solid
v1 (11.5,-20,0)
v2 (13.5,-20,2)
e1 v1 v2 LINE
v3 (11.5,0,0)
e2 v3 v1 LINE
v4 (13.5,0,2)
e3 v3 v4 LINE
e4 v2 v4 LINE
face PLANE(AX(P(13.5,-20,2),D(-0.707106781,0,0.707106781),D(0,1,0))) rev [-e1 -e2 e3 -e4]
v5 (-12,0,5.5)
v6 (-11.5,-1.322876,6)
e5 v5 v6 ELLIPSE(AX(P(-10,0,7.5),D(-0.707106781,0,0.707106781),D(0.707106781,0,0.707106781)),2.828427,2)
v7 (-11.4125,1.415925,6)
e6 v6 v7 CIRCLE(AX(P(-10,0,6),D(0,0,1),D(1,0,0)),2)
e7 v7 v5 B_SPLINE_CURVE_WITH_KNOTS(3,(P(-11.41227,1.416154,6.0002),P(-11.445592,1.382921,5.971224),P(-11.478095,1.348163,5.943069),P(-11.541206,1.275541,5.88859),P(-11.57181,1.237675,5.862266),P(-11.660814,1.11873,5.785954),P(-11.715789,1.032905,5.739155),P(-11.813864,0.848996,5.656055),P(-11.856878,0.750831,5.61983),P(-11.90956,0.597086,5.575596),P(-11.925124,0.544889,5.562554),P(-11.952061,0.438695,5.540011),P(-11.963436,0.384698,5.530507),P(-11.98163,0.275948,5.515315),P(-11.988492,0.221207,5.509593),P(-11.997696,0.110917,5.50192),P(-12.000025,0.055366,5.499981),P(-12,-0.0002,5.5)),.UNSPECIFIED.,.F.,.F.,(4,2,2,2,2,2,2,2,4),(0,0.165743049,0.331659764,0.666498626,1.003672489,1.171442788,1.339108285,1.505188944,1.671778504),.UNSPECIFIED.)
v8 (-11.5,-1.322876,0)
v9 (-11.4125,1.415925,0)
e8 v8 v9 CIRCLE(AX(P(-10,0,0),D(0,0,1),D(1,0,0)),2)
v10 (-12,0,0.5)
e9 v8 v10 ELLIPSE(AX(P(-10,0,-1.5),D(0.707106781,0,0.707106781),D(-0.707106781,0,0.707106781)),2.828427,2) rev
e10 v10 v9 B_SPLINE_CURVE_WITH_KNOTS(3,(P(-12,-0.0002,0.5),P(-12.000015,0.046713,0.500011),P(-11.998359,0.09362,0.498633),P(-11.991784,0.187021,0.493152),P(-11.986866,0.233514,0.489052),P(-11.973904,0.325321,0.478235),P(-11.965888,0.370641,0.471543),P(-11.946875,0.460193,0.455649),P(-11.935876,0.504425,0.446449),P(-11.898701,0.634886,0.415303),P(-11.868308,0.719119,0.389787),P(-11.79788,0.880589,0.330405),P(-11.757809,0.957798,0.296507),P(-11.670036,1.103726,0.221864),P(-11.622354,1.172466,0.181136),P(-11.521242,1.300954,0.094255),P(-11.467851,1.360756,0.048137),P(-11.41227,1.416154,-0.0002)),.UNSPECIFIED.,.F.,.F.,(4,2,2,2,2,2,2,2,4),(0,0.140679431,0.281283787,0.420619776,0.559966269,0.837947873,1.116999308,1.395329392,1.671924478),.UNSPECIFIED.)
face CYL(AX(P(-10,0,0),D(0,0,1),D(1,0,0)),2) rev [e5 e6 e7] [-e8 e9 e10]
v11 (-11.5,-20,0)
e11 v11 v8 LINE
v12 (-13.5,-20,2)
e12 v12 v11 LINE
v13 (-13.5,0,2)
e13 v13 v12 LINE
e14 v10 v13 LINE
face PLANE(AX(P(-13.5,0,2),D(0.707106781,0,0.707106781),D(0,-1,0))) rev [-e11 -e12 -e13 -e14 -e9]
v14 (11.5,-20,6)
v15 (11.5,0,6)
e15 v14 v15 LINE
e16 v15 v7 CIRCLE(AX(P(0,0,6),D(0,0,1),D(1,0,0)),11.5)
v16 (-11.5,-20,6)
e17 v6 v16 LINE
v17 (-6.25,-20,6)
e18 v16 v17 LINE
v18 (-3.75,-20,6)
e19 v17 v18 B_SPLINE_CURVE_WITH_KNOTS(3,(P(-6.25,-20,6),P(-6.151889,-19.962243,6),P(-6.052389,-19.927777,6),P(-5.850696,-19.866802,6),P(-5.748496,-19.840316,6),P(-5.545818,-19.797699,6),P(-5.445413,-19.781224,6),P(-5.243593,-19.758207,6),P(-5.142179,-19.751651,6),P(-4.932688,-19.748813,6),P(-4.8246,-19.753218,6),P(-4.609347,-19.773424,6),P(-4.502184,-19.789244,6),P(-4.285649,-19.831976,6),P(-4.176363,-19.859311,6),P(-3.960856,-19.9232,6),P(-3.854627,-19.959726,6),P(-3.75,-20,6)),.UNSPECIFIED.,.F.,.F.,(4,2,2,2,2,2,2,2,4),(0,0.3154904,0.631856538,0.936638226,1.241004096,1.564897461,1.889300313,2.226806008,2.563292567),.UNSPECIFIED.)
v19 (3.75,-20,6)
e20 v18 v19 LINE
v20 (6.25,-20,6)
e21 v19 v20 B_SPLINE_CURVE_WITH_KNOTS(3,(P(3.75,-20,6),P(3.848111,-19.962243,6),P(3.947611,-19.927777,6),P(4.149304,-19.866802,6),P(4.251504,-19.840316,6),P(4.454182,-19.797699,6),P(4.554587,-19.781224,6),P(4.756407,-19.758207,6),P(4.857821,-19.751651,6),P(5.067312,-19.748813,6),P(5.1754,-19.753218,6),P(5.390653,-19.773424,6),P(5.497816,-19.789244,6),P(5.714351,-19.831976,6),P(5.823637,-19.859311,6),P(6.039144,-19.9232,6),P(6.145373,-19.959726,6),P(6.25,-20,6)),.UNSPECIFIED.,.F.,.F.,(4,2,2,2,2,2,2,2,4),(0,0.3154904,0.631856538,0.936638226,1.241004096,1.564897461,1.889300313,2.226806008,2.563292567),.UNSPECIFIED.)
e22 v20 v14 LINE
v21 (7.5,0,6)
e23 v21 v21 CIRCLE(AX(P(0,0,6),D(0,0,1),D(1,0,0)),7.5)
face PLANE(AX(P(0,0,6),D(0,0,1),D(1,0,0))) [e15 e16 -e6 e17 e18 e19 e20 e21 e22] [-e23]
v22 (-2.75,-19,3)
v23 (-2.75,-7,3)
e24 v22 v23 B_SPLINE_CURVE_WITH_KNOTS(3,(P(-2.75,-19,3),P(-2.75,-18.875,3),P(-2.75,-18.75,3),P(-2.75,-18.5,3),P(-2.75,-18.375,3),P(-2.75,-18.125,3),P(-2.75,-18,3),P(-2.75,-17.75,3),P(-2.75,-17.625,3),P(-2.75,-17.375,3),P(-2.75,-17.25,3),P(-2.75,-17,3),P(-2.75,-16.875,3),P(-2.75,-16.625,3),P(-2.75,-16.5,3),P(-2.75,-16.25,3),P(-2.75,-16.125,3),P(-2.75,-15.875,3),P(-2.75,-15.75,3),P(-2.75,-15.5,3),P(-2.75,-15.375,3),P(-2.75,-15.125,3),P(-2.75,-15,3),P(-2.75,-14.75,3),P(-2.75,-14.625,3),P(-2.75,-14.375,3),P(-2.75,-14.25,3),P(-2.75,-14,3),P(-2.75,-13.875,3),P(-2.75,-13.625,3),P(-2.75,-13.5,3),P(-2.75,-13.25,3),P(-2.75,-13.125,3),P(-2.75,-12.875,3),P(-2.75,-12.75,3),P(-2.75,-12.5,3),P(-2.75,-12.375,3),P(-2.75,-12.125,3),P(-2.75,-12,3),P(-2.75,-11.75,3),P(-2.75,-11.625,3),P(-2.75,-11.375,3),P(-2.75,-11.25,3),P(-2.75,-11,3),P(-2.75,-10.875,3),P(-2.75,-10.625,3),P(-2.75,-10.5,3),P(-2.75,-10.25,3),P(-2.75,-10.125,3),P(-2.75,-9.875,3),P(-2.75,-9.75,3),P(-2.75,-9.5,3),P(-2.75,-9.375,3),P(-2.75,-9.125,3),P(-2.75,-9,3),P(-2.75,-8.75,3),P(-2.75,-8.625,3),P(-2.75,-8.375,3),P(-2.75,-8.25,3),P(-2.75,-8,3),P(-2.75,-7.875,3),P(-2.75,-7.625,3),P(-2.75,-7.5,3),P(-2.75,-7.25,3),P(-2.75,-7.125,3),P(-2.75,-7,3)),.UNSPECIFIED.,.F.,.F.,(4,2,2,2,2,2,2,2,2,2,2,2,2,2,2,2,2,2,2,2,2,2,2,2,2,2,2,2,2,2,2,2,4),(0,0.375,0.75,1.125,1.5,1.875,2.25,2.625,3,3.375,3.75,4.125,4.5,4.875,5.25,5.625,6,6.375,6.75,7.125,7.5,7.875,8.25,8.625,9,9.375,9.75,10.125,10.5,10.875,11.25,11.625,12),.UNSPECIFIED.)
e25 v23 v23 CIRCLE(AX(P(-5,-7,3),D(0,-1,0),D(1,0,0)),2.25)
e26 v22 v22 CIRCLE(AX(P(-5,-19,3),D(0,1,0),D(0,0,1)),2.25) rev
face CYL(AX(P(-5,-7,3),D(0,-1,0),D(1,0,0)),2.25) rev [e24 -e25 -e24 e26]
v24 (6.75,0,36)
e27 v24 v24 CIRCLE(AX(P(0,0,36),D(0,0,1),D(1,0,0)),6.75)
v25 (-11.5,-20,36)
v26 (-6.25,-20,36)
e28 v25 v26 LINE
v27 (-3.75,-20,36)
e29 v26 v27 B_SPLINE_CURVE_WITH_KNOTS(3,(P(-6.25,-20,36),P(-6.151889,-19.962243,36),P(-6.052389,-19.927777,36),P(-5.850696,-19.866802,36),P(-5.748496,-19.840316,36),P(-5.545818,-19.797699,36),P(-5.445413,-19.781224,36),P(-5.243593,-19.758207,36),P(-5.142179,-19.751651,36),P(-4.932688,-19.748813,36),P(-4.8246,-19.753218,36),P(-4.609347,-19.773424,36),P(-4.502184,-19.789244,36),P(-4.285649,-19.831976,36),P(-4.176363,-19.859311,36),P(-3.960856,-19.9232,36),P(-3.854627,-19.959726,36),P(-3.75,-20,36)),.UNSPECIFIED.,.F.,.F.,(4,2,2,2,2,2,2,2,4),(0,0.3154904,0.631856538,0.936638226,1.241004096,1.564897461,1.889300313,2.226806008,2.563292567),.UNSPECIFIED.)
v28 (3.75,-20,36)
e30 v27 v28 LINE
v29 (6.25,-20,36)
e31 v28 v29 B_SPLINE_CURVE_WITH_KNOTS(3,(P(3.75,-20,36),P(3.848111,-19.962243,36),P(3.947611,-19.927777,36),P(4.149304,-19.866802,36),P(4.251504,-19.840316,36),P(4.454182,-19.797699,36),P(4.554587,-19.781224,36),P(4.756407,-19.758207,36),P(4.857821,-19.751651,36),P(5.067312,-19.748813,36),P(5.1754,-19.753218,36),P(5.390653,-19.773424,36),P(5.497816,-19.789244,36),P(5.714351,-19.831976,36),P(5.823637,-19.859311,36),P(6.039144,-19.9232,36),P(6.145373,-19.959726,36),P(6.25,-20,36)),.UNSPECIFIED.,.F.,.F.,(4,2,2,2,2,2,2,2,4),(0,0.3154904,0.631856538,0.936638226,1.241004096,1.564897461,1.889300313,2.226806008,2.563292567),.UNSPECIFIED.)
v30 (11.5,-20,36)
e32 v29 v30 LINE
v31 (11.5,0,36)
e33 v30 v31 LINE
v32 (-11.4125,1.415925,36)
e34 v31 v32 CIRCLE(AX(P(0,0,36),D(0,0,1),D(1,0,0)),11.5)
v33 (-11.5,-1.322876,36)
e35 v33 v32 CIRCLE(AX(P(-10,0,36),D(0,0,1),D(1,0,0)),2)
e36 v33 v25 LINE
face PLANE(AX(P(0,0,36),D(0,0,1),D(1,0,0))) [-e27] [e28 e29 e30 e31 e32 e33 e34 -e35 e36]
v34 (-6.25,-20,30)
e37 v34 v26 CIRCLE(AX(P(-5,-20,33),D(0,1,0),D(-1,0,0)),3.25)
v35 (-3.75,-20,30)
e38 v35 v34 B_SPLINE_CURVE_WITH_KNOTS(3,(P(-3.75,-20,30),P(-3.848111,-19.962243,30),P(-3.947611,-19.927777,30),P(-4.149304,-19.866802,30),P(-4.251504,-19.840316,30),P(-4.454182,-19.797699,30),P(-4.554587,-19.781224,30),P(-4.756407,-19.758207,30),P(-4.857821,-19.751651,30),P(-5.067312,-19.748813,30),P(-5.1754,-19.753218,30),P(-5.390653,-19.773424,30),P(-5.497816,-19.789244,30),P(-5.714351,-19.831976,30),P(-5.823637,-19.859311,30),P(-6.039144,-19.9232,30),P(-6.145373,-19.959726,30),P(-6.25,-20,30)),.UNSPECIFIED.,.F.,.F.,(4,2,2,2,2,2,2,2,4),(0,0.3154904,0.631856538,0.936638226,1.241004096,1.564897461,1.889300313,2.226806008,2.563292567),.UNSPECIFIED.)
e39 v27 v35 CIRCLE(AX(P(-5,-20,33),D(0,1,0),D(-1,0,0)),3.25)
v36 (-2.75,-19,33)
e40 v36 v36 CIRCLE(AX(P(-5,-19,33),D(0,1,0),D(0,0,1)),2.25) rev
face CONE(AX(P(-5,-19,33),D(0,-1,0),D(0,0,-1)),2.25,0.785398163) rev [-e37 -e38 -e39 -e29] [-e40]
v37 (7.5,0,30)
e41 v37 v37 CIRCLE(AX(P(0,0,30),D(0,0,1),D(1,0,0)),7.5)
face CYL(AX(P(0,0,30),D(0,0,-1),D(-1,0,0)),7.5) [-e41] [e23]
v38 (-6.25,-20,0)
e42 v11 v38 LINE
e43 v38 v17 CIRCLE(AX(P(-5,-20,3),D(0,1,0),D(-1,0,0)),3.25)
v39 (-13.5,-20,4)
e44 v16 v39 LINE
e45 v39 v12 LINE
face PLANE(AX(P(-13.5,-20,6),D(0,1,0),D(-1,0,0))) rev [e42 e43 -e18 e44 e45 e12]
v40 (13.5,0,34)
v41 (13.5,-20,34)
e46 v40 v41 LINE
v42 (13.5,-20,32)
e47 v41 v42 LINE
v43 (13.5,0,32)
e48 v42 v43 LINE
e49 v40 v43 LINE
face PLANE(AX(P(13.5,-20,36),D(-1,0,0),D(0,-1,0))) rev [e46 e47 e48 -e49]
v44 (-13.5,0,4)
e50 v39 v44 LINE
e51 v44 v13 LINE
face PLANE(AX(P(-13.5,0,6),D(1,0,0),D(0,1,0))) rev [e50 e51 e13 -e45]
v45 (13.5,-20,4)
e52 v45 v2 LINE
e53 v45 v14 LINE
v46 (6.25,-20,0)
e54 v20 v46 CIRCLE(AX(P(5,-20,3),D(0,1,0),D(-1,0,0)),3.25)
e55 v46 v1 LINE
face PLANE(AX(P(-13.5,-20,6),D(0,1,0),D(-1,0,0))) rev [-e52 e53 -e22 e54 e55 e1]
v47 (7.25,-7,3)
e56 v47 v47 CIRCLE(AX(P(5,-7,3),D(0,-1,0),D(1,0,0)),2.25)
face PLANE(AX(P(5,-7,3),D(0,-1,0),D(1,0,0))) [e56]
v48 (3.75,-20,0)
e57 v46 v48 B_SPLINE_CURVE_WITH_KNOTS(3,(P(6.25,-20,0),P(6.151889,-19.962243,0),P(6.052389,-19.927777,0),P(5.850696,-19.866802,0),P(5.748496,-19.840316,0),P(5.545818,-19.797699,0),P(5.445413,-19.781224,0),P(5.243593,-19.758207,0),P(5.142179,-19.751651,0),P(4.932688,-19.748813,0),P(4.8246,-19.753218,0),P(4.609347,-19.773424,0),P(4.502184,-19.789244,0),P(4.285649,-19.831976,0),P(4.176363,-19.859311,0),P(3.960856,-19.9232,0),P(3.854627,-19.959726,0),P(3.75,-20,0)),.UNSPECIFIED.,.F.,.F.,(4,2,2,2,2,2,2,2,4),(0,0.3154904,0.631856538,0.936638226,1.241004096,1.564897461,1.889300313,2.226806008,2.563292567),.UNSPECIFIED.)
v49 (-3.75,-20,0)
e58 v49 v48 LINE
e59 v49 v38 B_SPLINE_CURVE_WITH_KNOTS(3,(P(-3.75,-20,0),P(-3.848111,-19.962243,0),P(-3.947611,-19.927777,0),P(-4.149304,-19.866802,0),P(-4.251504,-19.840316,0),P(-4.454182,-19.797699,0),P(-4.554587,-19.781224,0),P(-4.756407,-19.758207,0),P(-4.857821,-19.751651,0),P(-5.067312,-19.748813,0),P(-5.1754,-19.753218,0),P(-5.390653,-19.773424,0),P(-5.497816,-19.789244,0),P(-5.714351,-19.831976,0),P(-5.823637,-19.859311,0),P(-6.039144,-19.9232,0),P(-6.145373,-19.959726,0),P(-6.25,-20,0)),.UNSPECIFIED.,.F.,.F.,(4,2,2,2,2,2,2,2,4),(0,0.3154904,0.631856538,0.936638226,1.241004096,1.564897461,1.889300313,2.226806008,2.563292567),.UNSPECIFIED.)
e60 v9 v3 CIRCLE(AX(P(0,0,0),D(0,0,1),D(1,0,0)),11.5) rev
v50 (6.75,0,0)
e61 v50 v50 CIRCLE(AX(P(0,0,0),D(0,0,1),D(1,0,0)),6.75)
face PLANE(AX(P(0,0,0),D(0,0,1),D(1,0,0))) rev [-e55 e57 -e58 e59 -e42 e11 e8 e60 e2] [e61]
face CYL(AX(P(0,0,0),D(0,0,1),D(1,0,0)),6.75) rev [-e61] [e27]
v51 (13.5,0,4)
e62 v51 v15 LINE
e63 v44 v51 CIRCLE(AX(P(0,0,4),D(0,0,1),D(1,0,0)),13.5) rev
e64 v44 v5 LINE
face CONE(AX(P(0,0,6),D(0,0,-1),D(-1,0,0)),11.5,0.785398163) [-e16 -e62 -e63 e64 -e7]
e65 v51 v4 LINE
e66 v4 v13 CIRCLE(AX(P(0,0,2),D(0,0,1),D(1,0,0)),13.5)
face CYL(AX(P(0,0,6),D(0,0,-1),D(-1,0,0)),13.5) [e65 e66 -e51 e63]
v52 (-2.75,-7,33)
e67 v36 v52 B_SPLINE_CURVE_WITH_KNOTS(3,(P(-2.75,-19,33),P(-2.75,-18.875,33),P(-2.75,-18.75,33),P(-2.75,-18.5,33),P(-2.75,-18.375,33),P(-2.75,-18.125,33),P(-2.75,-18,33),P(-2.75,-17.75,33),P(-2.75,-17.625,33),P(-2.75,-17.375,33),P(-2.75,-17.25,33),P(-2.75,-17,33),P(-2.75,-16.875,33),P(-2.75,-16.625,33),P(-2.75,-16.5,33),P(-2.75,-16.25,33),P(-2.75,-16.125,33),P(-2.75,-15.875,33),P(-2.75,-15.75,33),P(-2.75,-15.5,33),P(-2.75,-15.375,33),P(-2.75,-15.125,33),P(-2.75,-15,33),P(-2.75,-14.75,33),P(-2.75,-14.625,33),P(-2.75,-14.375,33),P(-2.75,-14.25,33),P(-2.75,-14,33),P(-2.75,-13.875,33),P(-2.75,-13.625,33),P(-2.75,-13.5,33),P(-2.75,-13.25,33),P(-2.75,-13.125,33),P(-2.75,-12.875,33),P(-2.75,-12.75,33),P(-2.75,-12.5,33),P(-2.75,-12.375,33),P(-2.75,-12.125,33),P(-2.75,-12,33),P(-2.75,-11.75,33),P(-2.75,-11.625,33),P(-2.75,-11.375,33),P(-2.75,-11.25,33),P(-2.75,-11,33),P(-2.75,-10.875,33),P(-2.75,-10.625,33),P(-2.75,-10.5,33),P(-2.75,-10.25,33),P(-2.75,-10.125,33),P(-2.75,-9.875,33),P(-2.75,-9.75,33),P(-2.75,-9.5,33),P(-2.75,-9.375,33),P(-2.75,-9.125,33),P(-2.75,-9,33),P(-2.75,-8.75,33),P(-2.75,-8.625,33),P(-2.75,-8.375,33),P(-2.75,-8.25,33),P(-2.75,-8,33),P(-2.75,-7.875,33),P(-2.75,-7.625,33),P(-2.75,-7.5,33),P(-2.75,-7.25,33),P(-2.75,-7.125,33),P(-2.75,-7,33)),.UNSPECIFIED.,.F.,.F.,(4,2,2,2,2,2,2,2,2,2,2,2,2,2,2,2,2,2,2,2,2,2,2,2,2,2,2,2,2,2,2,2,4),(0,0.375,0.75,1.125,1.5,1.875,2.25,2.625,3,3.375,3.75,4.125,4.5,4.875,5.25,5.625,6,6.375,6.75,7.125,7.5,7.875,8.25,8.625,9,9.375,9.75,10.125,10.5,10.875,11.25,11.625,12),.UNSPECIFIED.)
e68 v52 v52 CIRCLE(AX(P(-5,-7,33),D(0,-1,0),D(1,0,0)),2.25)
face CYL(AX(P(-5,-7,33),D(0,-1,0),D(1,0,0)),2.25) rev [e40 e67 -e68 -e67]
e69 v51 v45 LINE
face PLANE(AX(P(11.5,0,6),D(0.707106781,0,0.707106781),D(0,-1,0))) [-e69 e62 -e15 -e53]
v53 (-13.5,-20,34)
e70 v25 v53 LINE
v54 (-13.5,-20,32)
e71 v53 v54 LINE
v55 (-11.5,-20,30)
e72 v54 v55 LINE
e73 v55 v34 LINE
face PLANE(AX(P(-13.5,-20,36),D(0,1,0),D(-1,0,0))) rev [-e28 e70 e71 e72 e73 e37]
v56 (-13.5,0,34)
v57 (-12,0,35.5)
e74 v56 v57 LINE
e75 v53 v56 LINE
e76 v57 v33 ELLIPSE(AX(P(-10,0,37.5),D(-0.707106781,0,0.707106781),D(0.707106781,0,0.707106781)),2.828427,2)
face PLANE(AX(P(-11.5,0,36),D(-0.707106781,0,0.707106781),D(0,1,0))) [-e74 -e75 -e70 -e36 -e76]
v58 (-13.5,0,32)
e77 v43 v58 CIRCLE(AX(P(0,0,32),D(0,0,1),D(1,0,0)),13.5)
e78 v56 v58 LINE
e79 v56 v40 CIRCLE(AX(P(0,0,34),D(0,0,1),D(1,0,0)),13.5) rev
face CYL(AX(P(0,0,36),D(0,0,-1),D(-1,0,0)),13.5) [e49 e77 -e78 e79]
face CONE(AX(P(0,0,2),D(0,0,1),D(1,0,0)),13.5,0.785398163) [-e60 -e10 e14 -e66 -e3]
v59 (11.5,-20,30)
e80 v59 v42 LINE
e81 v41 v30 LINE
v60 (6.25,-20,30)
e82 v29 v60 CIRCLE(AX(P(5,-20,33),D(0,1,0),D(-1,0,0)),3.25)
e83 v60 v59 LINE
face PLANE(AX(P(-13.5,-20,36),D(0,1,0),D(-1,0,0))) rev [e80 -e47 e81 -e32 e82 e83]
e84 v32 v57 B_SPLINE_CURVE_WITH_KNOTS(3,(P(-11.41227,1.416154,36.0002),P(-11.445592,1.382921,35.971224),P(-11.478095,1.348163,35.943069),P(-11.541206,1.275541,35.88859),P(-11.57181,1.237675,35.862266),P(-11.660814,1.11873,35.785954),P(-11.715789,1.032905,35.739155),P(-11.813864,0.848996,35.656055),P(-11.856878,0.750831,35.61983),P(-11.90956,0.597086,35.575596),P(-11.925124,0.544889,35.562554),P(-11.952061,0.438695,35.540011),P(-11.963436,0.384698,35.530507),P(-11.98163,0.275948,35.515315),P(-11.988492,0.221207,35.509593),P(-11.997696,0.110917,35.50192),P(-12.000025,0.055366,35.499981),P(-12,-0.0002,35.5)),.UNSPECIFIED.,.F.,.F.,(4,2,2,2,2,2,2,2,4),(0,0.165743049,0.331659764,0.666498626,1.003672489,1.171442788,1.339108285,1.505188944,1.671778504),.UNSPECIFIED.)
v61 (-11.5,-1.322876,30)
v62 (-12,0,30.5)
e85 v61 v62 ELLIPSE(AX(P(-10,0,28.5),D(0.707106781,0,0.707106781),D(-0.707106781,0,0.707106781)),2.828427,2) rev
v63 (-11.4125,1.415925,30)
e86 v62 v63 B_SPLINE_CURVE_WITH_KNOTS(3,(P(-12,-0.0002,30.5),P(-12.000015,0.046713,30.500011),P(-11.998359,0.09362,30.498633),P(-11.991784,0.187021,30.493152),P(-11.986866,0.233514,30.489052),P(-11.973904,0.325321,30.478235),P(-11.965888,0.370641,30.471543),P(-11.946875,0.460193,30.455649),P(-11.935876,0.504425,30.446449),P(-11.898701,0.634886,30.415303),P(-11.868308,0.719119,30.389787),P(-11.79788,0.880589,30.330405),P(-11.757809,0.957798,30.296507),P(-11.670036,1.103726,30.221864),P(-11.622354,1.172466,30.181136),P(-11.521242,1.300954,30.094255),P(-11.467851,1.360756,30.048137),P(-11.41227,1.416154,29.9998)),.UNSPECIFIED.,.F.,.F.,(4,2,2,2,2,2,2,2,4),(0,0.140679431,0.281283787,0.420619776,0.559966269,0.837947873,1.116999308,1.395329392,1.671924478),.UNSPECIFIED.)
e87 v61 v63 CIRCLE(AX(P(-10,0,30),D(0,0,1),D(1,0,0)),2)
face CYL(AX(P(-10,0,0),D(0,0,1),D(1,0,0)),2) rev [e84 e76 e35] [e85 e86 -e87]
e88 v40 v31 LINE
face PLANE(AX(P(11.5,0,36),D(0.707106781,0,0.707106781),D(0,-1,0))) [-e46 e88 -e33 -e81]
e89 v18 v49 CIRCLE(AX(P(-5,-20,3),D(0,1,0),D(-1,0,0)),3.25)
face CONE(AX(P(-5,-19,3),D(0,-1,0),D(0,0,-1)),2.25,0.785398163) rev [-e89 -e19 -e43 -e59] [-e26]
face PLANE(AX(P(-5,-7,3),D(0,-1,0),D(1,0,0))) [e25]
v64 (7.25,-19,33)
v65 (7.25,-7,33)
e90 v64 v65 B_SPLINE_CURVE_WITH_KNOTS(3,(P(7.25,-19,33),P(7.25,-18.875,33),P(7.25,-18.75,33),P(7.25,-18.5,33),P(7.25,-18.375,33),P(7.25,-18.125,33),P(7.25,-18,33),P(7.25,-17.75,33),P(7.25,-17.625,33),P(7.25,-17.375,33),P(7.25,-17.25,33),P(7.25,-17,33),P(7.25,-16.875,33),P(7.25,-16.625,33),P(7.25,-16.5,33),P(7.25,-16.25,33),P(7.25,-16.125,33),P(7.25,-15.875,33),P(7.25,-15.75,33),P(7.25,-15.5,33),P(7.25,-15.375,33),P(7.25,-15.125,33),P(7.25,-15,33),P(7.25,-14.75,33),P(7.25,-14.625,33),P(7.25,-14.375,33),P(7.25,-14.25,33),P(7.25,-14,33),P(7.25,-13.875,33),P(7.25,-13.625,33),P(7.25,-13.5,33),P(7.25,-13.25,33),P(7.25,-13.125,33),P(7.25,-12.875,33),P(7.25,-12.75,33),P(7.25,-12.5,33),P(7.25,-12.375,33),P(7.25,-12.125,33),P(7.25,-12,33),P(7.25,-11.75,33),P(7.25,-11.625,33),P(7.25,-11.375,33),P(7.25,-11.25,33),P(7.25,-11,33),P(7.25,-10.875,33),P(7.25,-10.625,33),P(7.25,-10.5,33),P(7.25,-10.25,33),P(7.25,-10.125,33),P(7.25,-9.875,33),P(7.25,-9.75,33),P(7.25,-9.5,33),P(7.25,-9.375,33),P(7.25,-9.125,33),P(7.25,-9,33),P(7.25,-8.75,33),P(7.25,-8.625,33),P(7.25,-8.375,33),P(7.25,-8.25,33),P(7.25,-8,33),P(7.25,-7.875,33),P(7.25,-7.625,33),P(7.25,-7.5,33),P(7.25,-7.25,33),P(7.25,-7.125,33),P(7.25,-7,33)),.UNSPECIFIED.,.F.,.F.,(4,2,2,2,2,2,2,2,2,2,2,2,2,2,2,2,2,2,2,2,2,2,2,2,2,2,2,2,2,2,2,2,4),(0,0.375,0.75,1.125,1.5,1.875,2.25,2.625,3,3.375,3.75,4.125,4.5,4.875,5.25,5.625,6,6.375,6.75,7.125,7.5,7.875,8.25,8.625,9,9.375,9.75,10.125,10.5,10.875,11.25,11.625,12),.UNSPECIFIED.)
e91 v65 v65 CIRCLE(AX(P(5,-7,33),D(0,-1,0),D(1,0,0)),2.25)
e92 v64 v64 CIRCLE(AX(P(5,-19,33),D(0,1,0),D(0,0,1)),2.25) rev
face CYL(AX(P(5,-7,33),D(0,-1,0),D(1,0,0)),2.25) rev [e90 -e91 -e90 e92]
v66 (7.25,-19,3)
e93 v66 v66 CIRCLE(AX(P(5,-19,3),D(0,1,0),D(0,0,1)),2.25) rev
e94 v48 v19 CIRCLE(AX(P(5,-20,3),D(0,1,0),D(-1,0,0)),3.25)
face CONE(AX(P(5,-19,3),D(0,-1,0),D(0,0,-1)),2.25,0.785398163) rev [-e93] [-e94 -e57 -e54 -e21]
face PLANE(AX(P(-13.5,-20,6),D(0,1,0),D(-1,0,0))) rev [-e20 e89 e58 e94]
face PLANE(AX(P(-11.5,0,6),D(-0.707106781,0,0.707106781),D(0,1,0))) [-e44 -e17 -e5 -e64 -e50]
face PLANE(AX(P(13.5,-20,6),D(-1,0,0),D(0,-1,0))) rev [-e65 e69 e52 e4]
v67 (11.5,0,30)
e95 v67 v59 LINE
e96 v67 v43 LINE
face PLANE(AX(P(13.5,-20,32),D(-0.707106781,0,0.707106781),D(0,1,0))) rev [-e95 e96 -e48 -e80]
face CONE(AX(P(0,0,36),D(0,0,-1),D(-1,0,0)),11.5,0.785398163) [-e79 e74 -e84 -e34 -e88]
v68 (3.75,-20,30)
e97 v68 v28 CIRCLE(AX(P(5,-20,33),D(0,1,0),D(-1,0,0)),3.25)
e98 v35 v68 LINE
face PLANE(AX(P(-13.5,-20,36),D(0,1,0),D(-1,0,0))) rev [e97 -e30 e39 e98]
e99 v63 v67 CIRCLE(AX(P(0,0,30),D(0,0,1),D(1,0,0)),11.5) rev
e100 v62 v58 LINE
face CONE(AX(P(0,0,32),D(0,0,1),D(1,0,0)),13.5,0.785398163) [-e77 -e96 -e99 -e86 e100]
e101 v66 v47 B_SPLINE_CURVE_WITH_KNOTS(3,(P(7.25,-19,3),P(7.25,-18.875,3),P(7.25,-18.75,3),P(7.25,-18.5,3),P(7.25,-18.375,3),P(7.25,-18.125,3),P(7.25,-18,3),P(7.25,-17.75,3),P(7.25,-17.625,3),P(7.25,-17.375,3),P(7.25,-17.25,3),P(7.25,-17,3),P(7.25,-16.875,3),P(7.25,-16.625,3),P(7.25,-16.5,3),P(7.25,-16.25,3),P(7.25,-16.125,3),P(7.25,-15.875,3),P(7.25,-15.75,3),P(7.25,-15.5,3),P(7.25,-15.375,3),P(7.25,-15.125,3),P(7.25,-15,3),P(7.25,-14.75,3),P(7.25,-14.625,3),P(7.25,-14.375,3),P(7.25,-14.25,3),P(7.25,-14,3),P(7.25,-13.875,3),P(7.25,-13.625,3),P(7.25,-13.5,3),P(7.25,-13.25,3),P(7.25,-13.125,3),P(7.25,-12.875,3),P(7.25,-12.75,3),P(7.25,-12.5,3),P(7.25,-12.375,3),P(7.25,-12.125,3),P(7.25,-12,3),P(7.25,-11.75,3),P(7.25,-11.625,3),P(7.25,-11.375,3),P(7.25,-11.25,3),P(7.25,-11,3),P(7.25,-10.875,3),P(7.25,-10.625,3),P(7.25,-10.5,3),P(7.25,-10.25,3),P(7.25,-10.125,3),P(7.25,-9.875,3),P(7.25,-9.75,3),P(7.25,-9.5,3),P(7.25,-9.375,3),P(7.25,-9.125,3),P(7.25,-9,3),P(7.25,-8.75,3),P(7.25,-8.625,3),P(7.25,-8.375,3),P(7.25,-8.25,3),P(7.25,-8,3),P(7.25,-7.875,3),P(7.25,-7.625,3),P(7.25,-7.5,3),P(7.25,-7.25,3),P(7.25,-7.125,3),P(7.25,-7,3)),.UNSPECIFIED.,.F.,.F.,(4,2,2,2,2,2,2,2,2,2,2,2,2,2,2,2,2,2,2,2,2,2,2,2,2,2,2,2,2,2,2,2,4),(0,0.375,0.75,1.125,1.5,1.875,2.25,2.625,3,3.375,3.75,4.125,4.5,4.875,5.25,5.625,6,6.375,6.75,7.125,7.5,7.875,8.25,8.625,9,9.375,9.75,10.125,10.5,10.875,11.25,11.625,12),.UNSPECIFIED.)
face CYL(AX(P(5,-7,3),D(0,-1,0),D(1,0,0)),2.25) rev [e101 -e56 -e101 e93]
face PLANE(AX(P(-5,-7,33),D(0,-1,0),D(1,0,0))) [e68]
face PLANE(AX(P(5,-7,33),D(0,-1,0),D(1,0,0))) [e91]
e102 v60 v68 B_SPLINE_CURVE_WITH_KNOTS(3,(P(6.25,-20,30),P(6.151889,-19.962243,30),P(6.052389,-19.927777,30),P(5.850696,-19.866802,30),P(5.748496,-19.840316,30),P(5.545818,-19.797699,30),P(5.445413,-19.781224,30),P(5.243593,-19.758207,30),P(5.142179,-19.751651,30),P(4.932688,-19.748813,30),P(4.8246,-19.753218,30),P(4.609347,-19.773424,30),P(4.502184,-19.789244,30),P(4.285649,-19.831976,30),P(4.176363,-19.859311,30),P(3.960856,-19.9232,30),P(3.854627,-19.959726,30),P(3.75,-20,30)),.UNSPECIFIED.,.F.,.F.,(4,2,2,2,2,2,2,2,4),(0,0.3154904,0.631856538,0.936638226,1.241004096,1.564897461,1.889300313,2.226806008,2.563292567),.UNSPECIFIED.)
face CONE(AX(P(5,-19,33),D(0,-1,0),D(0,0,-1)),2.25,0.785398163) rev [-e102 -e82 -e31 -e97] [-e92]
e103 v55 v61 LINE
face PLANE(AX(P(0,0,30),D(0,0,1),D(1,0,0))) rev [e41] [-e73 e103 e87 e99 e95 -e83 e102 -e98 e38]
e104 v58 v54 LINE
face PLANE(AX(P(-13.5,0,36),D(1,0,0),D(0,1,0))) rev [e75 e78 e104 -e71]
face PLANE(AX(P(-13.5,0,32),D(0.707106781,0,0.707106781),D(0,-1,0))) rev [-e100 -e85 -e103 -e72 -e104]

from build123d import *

# Parameters (mm, degrees)
BOSS_EXTRUDE1_DEPTH = 6
SKETCH2_R           = 7.5
BOSS_EXTRUDE2_DEPTH = 24
BOSS_EXTRUDE3_DEPTH = 6
SKETCH4_R           = 6.75
CUT_EXTRUDE1_DEPTH  = 44.338781709
SKETCH5_R           = 2.25
CUT_EXTRUDE2_DEPTH  = 13
CHAMFER1_SIZE       = 1
CHAMFER2_SIZE       = 2
SKETCH6_R           = 2
CUT_EXTRUDE3_DEPTH  = 44.338781709


with BuildPart() as part:
    # Sketch1 → Boss-Extrude1 (new body)
    with BuildSketch(Plane.XY):
        with BuildLine():
            Line((-13.5, 0), (-13.5, -20))
            Line((-13.5, -20), (13.5, -20))
            Line((13.5, -20), (13.5, 0))
            ThreePointArc((13.5, 0), (0, 13.5), (-13.5, 0))
        make_face()
    extrude(amount=BOSS_EXTRUDE1_DEPTH)

    # Sketch2 → Boss-Extrude2 (add)
    with BuildSketch(Plane.XY.offset(6)):
        Circle(SKETCH2_R)
    extrude(amount=BOSS_EXTRUDE2_DEPTH)

    # Sketch3 → Boss-Extrude3 (add)
    with BuildSketch(Plane.XY.offset(30)):
        with BuildLine():
            Line((-13.5, 0), (-13.5, -20))
            Line((-13.5, -20), (13.5, -20))
            Line((13.5, -20), (13.5, 0))
            ThreePointArc((13.5, 0), (0, 13.5), (-13.5, 0))
        make_face()
    extrude(amount=BOSS_EXTRUDE3_DEPTH)

    # Sketch4 → Cut-Extrude1 (cut, through all)
    with BuildSketch(Plane.XY.offset(36)):
        Circle(SKETCH4_R)
    extrude(amount=-CUT_EXTRUDE1_DEPTH, mode=Mode.SUBTRACT)

    # Sketch5 → Cut-Extrude2 (cut)
    with BuildSketch(Plane.XZ.offset(20)):
        with Locations((-5, 33)):
            Circle(SKETCH5_R)
        with Locations((5, 33)):
            Circle(SKETCH5_R)
        with Locations((-5, 3)):
            Circle(SKETCH5_R)
        with Locations((5, 3)):
            Circle(SKETCH5_R)
    extrude(amount=-CUT_EXTRUDE2_DEPTH, mode=Mode.SUBTRACT)

    # Chamfer1
    # the kernel refuses this chamfer: 1 mm, written as the material it takes off along each edge
    with BuildSketch(Plane(origin=(5, -20, 33), x_dir=(1, 0, 0), z_dir=(0, 0, -1))) as chamfer1_piece_1:
        Polygon((2.25 + CHAMFER1_SIZE, 0), (2.25, -CHAMFER1_SIZE), (2.25, 0), align=None)
    revolve(axis=Axis((5, -20, 33), (0, -1, 0)), mode=Mode.SUBTRACT)
    with BuildSketch(Plane(origin=(-5, -20, 3), x_dir=(1, 0, 0), z_dir=(0, 0, -1))) as chamfer1_piece_2:
        Polygon((2.25 + CHAMFER1_SIZE, 0), (2.25, -CHAMFER1_SIZE), (2.25, 0), align=None)
    revolve(axis=Axis((-5, -20, 3), (0, -1, 0)), mode=Mode.SUBTRACT)
    with BuildSketch(Plane(origin=(5, -20, 3), x_dir=(1, 0, 0), z_dir=(0, 0, -1))) as chamfer1_piece_3:
        Polygon((2.25 + CHAMFER1_SIZE, 0), (2.25, -CHAMFER1_SIZE), (2.25, 0), align=None)
    revolve(axis=Axis((5, -20, 3), (0, -1, 0)), mode=Mode.SUBTRACT)
    with BuildSketch(Plane(origin=(-5, -20, 33), x_dir=(1, 0, 0), z_dir=(0, 0, -1))) as chamfer1_piece_4:
        Polygon((2.25 + CHAMFER1_SIZE, 0), (2.25, -CHAMFER1_SIZE), (2.25, 0), align=None)
    revolve(axis=Axis((-5, -20, 33), (0, -1, 0)), mode=Mode.SUBTRACT)

    # Chamfer2
    chamfer2_edges = [part.edges().sort_by_distance(p)[0] for p in [
        (13.5, -10, 6),
        (0, 13.5, 30),
        (-13.5, -10, 30),
        (13.5, -10, 30),
        (0, 13.5, 36),
        (-13.5, -10, 36),
        (13.5, -10, 36),
        (0, 13.5, 6),
        (13.5, -10, 0),
        (-13.5, -10, 0),
        (0, 13.5, 0),
        (-13.5, -10, 6),
    ]]
    chamfer(chamfer2_edges, length=CHAMFER2_SIZE)

    # Sketch6 → Cut-Extrude3 (cut, through all)
    with BuildSketch(Plane.XY.offset(36)):
        with Locations(Location((-10, 0, 0), (0, 0, 221.409622109))):
            Circle(SKETCH6_R)
    extrude(amount=-CUT_EXTRUDE3_DEPTH, mode=Mode.SUBTRACT)


solid = part.part
